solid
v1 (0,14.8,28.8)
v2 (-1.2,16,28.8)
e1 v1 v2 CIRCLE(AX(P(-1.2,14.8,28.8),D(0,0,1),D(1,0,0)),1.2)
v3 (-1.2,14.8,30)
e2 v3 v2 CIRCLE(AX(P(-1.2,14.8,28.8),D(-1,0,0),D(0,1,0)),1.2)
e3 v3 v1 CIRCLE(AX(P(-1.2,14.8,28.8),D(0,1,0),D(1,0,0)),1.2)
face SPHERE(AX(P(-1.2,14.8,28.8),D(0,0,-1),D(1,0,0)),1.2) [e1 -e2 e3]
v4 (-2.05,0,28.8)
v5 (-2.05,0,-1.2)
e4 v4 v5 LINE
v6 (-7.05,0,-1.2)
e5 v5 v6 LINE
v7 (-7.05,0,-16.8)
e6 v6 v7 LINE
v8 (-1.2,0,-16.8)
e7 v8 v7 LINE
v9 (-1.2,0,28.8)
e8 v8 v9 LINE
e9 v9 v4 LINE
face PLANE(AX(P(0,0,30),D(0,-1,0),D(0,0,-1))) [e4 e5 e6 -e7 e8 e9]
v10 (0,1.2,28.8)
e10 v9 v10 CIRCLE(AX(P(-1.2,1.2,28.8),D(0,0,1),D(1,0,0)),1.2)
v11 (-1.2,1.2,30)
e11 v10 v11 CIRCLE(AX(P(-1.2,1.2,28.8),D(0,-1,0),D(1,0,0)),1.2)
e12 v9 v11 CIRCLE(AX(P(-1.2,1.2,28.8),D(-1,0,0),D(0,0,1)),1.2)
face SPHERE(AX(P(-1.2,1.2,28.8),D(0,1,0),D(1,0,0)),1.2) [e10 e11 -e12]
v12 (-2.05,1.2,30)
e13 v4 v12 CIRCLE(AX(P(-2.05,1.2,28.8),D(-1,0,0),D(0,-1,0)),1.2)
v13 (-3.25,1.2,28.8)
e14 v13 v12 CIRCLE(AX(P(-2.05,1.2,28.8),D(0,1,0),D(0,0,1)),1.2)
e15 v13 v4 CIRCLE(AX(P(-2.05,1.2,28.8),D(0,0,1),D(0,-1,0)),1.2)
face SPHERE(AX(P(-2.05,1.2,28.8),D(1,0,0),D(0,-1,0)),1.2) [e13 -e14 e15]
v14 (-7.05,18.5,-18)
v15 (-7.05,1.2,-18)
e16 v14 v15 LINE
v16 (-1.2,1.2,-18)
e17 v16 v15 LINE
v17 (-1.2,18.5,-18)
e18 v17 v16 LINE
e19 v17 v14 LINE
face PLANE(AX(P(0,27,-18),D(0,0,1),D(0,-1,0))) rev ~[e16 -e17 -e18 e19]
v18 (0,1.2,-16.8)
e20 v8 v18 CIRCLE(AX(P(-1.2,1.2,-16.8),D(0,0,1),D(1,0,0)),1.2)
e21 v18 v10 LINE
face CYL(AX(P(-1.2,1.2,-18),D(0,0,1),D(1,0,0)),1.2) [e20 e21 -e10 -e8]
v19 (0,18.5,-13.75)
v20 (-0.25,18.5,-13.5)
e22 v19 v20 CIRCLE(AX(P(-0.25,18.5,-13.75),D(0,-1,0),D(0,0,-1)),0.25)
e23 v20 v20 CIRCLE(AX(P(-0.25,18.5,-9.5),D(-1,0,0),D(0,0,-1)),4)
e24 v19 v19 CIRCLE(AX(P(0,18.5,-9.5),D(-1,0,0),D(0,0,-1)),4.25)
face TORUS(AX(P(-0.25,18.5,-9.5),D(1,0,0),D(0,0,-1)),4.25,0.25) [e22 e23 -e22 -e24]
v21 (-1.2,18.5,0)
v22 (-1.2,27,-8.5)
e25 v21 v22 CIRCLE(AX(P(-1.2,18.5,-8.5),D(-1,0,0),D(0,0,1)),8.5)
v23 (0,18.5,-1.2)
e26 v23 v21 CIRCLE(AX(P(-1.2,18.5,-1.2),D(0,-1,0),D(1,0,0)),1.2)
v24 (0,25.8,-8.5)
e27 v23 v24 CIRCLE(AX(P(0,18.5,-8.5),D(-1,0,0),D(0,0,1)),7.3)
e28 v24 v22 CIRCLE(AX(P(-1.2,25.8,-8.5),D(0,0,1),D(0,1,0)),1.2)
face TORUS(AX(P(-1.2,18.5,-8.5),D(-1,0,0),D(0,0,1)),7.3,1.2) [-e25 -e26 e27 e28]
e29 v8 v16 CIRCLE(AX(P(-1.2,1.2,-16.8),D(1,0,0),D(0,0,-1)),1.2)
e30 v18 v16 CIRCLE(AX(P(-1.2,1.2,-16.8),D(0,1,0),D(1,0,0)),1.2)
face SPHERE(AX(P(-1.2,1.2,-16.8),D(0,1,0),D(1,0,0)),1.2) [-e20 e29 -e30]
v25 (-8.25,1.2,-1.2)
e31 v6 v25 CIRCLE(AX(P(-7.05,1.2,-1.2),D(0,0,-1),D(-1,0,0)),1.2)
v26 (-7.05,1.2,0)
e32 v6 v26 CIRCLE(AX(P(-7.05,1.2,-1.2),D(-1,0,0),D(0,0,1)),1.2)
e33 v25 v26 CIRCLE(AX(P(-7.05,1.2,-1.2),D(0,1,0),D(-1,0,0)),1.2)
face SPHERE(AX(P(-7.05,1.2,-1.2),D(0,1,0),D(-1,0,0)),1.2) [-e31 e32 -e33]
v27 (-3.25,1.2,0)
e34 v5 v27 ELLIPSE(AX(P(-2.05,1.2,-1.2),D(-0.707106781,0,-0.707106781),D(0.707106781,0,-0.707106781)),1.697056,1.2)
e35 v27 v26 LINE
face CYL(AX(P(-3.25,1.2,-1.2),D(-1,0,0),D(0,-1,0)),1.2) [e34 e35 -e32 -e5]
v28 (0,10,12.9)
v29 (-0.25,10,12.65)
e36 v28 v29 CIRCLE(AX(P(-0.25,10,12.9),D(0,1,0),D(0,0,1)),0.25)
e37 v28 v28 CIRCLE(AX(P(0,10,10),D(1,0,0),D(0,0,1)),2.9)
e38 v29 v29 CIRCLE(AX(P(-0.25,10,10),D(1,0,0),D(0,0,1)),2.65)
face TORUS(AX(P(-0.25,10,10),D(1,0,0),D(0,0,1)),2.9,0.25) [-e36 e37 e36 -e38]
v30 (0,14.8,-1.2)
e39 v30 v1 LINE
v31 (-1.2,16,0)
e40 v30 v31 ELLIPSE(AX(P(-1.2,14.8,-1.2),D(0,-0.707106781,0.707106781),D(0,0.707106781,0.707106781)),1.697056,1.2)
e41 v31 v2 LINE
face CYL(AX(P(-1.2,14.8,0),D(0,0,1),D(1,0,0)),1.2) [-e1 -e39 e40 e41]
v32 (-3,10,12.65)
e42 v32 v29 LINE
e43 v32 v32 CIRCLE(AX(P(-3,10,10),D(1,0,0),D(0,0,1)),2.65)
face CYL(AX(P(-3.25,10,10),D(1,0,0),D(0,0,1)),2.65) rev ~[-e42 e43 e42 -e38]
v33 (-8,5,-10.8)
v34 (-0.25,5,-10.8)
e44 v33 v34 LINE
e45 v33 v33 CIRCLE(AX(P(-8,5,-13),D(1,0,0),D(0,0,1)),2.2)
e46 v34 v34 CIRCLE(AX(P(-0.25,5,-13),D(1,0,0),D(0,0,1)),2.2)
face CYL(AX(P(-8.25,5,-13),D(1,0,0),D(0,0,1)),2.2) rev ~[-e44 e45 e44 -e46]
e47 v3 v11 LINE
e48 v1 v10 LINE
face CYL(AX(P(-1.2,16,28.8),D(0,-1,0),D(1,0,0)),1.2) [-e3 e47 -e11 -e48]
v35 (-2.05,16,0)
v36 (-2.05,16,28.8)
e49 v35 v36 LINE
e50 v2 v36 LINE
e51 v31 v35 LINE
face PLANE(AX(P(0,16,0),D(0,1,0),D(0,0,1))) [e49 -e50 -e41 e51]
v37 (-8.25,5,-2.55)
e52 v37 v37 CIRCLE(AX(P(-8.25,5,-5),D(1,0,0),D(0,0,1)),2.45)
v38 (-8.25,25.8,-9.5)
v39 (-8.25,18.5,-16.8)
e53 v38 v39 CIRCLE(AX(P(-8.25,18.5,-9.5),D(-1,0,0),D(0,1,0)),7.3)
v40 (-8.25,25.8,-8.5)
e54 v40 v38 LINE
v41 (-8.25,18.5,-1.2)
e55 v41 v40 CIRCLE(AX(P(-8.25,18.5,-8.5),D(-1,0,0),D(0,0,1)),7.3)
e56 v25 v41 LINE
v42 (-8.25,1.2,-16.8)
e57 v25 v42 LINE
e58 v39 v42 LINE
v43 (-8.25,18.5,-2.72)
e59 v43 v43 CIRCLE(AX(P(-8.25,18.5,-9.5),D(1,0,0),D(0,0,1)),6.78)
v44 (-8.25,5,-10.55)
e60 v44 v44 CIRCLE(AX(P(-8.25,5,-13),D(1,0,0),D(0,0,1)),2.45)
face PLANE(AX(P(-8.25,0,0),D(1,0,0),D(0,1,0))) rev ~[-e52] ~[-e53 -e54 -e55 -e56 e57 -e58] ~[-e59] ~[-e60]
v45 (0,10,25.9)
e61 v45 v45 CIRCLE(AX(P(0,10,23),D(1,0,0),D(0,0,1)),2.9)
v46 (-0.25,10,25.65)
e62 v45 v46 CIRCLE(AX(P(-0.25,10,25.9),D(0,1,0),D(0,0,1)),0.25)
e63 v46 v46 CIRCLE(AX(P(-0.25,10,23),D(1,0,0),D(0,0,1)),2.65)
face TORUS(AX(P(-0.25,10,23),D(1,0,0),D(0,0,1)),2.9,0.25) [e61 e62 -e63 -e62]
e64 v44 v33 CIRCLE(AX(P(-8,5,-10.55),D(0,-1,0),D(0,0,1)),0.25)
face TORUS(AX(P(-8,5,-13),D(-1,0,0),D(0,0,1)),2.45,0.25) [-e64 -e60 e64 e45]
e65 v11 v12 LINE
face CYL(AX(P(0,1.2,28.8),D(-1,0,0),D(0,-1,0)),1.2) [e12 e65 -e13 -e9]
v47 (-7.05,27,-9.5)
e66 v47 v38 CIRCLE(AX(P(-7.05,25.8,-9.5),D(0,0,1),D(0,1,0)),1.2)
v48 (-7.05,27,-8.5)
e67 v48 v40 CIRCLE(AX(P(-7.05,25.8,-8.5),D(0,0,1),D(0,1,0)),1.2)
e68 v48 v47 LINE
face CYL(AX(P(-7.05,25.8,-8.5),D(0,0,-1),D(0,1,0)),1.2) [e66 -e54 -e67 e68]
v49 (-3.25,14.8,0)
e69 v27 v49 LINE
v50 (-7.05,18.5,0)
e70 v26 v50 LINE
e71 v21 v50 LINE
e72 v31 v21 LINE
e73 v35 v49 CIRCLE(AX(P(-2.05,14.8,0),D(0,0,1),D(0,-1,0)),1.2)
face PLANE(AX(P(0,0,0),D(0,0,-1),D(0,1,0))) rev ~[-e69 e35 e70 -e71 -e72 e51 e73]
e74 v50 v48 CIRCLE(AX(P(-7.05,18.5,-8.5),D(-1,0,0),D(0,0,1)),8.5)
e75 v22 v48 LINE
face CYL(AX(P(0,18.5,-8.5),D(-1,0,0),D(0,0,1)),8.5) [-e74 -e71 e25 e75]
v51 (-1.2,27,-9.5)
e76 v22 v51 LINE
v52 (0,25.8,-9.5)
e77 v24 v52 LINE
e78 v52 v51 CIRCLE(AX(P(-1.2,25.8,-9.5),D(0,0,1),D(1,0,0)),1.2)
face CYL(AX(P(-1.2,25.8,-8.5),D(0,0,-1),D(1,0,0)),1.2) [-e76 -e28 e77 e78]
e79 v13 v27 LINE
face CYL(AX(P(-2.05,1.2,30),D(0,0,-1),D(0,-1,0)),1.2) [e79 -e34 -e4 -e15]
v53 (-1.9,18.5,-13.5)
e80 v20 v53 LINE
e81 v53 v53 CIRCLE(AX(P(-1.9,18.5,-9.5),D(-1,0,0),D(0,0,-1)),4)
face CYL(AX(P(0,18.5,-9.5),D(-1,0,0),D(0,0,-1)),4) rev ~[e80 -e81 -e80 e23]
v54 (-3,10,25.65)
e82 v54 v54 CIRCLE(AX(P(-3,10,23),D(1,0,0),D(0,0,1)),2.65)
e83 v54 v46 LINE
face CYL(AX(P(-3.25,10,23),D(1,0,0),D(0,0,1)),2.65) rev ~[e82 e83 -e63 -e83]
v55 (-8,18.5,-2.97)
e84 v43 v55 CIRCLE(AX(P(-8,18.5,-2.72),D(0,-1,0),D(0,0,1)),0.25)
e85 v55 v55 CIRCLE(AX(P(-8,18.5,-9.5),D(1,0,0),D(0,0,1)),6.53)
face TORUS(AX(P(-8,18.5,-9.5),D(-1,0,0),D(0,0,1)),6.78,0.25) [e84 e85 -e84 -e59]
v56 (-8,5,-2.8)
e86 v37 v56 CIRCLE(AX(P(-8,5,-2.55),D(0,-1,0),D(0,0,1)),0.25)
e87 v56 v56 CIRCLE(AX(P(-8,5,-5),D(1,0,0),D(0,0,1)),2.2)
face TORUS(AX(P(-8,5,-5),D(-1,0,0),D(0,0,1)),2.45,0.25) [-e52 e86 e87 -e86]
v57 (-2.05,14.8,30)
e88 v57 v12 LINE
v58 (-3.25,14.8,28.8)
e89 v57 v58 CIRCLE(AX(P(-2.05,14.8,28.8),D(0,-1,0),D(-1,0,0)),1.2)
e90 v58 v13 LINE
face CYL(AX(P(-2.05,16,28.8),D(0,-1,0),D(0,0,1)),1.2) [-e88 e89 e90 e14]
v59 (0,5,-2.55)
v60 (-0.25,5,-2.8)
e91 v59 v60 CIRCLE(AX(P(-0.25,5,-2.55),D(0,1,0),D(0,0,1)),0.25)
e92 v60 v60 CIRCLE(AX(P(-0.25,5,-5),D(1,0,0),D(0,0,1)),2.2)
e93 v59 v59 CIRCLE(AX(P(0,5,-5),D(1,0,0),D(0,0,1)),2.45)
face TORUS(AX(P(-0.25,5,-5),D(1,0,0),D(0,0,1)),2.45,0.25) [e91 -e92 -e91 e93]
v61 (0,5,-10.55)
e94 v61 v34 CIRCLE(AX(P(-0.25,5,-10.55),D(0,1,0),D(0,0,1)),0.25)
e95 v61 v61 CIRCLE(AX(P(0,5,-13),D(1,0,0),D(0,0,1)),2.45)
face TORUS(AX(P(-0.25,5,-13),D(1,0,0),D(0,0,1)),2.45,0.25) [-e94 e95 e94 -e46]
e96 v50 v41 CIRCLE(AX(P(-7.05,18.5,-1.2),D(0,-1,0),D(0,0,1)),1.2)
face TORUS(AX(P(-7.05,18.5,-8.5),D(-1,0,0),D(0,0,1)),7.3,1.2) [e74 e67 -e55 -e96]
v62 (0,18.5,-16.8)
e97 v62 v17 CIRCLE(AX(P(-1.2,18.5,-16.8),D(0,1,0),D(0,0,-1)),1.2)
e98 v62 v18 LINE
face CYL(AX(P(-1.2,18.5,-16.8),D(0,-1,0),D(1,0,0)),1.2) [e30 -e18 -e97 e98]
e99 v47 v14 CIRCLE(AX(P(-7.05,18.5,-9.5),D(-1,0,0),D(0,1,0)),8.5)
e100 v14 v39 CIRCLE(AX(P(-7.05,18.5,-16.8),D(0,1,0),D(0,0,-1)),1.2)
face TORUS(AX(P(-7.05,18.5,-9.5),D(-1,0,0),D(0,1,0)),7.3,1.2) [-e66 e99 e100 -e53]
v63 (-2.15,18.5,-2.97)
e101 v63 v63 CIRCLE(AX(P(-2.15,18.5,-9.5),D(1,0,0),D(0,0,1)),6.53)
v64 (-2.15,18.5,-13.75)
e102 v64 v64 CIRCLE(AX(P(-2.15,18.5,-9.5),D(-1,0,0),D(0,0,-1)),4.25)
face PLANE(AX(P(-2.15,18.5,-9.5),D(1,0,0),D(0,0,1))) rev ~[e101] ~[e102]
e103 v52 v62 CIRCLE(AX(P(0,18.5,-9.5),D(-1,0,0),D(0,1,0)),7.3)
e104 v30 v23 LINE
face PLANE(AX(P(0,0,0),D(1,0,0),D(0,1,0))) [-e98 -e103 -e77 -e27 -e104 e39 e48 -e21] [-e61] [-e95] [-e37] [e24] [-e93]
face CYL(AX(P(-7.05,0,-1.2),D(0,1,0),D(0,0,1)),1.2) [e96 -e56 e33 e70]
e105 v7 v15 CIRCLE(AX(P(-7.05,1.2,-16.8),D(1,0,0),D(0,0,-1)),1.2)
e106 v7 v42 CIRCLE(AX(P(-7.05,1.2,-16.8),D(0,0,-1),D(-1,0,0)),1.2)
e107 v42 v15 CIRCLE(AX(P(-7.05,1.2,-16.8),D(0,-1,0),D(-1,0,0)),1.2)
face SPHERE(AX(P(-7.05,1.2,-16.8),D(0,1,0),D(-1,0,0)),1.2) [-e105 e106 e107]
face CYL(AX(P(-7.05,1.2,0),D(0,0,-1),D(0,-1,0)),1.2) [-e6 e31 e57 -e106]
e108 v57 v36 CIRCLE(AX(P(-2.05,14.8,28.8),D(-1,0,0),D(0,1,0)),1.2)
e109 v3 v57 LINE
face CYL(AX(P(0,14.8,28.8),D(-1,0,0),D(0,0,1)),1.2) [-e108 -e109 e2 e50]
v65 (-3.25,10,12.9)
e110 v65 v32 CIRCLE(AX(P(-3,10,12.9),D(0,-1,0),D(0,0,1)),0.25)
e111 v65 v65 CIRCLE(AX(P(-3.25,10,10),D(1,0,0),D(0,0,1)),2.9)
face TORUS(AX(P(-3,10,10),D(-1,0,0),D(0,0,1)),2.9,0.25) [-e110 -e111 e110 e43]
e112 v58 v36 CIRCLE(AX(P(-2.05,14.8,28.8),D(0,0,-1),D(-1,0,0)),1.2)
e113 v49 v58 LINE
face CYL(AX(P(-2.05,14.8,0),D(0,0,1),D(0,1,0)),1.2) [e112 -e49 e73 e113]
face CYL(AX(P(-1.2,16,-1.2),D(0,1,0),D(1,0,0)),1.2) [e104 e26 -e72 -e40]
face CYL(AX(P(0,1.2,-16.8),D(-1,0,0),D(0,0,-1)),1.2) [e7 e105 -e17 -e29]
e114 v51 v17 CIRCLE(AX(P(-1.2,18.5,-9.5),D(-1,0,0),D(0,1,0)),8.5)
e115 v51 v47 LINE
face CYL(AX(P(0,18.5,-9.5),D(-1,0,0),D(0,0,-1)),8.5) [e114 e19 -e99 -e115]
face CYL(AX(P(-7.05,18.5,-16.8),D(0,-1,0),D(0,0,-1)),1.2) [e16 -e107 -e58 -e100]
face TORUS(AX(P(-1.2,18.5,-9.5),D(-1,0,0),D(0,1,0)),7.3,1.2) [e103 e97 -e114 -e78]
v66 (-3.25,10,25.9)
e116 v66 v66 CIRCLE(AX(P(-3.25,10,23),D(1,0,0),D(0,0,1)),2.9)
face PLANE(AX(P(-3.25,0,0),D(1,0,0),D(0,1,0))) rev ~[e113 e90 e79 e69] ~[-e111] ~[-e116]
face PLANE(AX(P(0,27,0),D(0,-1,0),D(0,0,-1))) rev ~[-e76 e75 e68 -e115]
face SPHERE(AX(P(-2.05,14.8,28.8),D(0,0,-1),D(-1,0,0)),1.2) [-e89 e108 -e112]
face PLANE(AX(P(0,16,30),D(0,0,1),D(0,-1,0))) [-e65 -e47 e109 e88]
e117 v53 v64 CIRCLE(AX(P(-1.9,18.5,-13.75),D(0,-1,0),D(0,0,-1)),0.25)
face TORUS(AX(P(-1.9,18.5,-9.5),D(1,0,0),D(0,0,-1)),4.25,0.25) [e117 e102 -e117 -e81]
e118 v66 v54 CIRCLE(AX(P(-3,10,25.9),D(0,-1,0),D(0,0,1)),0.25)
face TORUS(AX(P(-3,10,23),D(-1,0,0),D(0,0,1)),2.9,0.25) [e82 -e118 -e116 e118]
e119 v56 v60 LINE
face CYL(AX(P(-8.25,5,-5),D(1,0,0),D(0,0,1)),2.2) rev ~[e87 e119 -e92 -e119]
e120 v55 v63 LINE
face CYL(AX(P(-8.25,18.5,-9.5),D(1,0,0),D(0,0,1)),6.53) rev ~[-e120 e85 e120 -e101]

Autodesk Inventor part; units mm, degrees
ref_plane "YZ Plane" through (0, 0, 0) normal (1, 0, 0) x (0, 1, 0)
ref_plane "XZ Plane" through (0, 0, 0) normal (0, 1, 0) x (-1, 0, 0)
ref_plane "XY Plane" through (0, 0, 0) normal (0, 0, 1) x (1, 0, 0)
sketch "Sketch1" plane through (0, 0, 0) normal (1, 0, 0) x (0, 1, 0)
  line L0 (27, 0) -> (27, -18)
  line L1 (0, 0) -> (0, -18)
  line L2 (27, -18) -> (0, -18)
  line L3 (0, 0) -> (27, 0)
  dimension "d2" = 18
  dimension "d11" = 27
sketch "Sketch2" plane through (0, 0, 0) normal (1, 0, 0) x (0, 1, 0)
  line L0 (0, 0) -> (16, 0)
  line L1 (16, 0) -> (16, 30)
  line L2 (16, 30) -> (0, 30)
  line L3 (0, 30) -> (0, 0)
  point P0 (7.5, 23)
  point P1 (8.5, 10)
  dimension "d8" = 30
  dimension "d9" = 7
  dimension "d10" = 10
  dimension "d66" = 16
  dimension "d71" = 7.5
extrude "Extrusion1" add sketch "Sketch2" against normal blind 3.25
extrude "Extrusion2" add sketch "Sketch1" against normal blind 8.25
sketch "Sketch3" plane through (-3.25, 0, 0) normal (-1, 0, 0) x (0, 0, 1)
  line L0 (0, 16) -> (0, 0) projected
  line L1 (0, 0) -> (30, 0) projected
  line L2 (30, 0) -> (30, 16) projected
  point P0 (10, 10)
  point P1 (23, 10)
  dimension "d16" = 10
  dimension "d17" = 10
  dimension "d18" = 7
  dimension "d19" = 10
hole "Hole1" at (-3.25, 10, 10) at (-3.25, 10, 23) direction (1, 0, 0) diameter 5.3 end through all
sketch "Sketch4" plane through (-8.25, 0, 0) normal (-1, 0, 0) x (0, 0, 1)
  line L0 (0, 27) -> (-18, 27) projected
  line L1 (-18, 27) -> (-18, 0) projected
  point P0 (-9.5, 18.5)
  dimension "d27" = 8.5
  dimension "d28" = 8.5
hole "Hole2" at (-8.25, 18.5, -9.5) direction (1, 0, 0) diameter 13.06 depth 6.1
sketch "Sketch5" plane through (0, 0, 0) normal (1, 0, 0) x (0, 0, -1)
  line L0 (18, 0) -> (18, 27) projected
  line L1 (18, 27) -> (0, 27) projected
  point P0 (0, 0)
  point P1 (9.5, 18.5)
  dimension "d36" = 8.5
  dimension "d37" = 8.5
hole "Hole3" at (0, 18.5, -9.5) direction (-1, 0, 0) diameter 8 end through all
fillet "Fillet1" radius 8.5 2 edges at (-4.125, 27, -18) (-4.125, 27, 0)
sketch "Sketch7" plane through (-8.25, 0, 0) normal (-1, 0, 0) x (0, 0, 1)
  line L0 (-18, 18.5) -> (-18, 0) projected
  line L1 (-18, 0) -> (0, 0) projected
  line L2 (0, 0) -> (0, 18.5) projected
  point P0 (-5, 5)
  point P1 (-13, 5)
  dimension "d49" = 5
  dimension "d50" = 5
  dimension "d51" = 5
  dimension "d52" = 5
hole "Hole4" at (-8.25, 5, -5) at (-8.25, 5, -13) direction (1, 0, 0) diameter 4.4 end through all
fillet "Fillet3" radius 0.25 11 edges at (-8.25, 18.5, -16.03) (-2.15, 18.5, -5.5) (0, 18.5, -5.5) (-3.25, 10, 7.35) (-3.25, 10, 20.35) (0, 10, 7.35) (0, 10, 20.35) (-8.25, 5, -15.2) (-8.25, 5, -7.2) (0, 5, -7.2) (0, 5, -15.2)
fillet "Fillet4" radius 1.2 20 edges at (-8.25, 24.5104, -2.4896) (-8.25, 27, -9) (-8.25, 24.5104, -15.5104) (-8.25, 9.25, -18) (-8.25, 0, -9) (-8.25, 9.25, 0) (0, 24.5104, -2.4896) (0, 16, 15) (0, 8, 30) (0, 0, 6) (0, 9.25, -18) (0, 24.5104, -15.5104) (0, 27, -9) (-1.625, 0, 30) (-3.25, 0, 15) (-5.75, 0, 0) (-4.125, 0, -18) (-3.25, 16, 15) (-3.25, 8, 30) (-1.625, 16, 30)
properties part number "13mmBearingBracketLeft"
